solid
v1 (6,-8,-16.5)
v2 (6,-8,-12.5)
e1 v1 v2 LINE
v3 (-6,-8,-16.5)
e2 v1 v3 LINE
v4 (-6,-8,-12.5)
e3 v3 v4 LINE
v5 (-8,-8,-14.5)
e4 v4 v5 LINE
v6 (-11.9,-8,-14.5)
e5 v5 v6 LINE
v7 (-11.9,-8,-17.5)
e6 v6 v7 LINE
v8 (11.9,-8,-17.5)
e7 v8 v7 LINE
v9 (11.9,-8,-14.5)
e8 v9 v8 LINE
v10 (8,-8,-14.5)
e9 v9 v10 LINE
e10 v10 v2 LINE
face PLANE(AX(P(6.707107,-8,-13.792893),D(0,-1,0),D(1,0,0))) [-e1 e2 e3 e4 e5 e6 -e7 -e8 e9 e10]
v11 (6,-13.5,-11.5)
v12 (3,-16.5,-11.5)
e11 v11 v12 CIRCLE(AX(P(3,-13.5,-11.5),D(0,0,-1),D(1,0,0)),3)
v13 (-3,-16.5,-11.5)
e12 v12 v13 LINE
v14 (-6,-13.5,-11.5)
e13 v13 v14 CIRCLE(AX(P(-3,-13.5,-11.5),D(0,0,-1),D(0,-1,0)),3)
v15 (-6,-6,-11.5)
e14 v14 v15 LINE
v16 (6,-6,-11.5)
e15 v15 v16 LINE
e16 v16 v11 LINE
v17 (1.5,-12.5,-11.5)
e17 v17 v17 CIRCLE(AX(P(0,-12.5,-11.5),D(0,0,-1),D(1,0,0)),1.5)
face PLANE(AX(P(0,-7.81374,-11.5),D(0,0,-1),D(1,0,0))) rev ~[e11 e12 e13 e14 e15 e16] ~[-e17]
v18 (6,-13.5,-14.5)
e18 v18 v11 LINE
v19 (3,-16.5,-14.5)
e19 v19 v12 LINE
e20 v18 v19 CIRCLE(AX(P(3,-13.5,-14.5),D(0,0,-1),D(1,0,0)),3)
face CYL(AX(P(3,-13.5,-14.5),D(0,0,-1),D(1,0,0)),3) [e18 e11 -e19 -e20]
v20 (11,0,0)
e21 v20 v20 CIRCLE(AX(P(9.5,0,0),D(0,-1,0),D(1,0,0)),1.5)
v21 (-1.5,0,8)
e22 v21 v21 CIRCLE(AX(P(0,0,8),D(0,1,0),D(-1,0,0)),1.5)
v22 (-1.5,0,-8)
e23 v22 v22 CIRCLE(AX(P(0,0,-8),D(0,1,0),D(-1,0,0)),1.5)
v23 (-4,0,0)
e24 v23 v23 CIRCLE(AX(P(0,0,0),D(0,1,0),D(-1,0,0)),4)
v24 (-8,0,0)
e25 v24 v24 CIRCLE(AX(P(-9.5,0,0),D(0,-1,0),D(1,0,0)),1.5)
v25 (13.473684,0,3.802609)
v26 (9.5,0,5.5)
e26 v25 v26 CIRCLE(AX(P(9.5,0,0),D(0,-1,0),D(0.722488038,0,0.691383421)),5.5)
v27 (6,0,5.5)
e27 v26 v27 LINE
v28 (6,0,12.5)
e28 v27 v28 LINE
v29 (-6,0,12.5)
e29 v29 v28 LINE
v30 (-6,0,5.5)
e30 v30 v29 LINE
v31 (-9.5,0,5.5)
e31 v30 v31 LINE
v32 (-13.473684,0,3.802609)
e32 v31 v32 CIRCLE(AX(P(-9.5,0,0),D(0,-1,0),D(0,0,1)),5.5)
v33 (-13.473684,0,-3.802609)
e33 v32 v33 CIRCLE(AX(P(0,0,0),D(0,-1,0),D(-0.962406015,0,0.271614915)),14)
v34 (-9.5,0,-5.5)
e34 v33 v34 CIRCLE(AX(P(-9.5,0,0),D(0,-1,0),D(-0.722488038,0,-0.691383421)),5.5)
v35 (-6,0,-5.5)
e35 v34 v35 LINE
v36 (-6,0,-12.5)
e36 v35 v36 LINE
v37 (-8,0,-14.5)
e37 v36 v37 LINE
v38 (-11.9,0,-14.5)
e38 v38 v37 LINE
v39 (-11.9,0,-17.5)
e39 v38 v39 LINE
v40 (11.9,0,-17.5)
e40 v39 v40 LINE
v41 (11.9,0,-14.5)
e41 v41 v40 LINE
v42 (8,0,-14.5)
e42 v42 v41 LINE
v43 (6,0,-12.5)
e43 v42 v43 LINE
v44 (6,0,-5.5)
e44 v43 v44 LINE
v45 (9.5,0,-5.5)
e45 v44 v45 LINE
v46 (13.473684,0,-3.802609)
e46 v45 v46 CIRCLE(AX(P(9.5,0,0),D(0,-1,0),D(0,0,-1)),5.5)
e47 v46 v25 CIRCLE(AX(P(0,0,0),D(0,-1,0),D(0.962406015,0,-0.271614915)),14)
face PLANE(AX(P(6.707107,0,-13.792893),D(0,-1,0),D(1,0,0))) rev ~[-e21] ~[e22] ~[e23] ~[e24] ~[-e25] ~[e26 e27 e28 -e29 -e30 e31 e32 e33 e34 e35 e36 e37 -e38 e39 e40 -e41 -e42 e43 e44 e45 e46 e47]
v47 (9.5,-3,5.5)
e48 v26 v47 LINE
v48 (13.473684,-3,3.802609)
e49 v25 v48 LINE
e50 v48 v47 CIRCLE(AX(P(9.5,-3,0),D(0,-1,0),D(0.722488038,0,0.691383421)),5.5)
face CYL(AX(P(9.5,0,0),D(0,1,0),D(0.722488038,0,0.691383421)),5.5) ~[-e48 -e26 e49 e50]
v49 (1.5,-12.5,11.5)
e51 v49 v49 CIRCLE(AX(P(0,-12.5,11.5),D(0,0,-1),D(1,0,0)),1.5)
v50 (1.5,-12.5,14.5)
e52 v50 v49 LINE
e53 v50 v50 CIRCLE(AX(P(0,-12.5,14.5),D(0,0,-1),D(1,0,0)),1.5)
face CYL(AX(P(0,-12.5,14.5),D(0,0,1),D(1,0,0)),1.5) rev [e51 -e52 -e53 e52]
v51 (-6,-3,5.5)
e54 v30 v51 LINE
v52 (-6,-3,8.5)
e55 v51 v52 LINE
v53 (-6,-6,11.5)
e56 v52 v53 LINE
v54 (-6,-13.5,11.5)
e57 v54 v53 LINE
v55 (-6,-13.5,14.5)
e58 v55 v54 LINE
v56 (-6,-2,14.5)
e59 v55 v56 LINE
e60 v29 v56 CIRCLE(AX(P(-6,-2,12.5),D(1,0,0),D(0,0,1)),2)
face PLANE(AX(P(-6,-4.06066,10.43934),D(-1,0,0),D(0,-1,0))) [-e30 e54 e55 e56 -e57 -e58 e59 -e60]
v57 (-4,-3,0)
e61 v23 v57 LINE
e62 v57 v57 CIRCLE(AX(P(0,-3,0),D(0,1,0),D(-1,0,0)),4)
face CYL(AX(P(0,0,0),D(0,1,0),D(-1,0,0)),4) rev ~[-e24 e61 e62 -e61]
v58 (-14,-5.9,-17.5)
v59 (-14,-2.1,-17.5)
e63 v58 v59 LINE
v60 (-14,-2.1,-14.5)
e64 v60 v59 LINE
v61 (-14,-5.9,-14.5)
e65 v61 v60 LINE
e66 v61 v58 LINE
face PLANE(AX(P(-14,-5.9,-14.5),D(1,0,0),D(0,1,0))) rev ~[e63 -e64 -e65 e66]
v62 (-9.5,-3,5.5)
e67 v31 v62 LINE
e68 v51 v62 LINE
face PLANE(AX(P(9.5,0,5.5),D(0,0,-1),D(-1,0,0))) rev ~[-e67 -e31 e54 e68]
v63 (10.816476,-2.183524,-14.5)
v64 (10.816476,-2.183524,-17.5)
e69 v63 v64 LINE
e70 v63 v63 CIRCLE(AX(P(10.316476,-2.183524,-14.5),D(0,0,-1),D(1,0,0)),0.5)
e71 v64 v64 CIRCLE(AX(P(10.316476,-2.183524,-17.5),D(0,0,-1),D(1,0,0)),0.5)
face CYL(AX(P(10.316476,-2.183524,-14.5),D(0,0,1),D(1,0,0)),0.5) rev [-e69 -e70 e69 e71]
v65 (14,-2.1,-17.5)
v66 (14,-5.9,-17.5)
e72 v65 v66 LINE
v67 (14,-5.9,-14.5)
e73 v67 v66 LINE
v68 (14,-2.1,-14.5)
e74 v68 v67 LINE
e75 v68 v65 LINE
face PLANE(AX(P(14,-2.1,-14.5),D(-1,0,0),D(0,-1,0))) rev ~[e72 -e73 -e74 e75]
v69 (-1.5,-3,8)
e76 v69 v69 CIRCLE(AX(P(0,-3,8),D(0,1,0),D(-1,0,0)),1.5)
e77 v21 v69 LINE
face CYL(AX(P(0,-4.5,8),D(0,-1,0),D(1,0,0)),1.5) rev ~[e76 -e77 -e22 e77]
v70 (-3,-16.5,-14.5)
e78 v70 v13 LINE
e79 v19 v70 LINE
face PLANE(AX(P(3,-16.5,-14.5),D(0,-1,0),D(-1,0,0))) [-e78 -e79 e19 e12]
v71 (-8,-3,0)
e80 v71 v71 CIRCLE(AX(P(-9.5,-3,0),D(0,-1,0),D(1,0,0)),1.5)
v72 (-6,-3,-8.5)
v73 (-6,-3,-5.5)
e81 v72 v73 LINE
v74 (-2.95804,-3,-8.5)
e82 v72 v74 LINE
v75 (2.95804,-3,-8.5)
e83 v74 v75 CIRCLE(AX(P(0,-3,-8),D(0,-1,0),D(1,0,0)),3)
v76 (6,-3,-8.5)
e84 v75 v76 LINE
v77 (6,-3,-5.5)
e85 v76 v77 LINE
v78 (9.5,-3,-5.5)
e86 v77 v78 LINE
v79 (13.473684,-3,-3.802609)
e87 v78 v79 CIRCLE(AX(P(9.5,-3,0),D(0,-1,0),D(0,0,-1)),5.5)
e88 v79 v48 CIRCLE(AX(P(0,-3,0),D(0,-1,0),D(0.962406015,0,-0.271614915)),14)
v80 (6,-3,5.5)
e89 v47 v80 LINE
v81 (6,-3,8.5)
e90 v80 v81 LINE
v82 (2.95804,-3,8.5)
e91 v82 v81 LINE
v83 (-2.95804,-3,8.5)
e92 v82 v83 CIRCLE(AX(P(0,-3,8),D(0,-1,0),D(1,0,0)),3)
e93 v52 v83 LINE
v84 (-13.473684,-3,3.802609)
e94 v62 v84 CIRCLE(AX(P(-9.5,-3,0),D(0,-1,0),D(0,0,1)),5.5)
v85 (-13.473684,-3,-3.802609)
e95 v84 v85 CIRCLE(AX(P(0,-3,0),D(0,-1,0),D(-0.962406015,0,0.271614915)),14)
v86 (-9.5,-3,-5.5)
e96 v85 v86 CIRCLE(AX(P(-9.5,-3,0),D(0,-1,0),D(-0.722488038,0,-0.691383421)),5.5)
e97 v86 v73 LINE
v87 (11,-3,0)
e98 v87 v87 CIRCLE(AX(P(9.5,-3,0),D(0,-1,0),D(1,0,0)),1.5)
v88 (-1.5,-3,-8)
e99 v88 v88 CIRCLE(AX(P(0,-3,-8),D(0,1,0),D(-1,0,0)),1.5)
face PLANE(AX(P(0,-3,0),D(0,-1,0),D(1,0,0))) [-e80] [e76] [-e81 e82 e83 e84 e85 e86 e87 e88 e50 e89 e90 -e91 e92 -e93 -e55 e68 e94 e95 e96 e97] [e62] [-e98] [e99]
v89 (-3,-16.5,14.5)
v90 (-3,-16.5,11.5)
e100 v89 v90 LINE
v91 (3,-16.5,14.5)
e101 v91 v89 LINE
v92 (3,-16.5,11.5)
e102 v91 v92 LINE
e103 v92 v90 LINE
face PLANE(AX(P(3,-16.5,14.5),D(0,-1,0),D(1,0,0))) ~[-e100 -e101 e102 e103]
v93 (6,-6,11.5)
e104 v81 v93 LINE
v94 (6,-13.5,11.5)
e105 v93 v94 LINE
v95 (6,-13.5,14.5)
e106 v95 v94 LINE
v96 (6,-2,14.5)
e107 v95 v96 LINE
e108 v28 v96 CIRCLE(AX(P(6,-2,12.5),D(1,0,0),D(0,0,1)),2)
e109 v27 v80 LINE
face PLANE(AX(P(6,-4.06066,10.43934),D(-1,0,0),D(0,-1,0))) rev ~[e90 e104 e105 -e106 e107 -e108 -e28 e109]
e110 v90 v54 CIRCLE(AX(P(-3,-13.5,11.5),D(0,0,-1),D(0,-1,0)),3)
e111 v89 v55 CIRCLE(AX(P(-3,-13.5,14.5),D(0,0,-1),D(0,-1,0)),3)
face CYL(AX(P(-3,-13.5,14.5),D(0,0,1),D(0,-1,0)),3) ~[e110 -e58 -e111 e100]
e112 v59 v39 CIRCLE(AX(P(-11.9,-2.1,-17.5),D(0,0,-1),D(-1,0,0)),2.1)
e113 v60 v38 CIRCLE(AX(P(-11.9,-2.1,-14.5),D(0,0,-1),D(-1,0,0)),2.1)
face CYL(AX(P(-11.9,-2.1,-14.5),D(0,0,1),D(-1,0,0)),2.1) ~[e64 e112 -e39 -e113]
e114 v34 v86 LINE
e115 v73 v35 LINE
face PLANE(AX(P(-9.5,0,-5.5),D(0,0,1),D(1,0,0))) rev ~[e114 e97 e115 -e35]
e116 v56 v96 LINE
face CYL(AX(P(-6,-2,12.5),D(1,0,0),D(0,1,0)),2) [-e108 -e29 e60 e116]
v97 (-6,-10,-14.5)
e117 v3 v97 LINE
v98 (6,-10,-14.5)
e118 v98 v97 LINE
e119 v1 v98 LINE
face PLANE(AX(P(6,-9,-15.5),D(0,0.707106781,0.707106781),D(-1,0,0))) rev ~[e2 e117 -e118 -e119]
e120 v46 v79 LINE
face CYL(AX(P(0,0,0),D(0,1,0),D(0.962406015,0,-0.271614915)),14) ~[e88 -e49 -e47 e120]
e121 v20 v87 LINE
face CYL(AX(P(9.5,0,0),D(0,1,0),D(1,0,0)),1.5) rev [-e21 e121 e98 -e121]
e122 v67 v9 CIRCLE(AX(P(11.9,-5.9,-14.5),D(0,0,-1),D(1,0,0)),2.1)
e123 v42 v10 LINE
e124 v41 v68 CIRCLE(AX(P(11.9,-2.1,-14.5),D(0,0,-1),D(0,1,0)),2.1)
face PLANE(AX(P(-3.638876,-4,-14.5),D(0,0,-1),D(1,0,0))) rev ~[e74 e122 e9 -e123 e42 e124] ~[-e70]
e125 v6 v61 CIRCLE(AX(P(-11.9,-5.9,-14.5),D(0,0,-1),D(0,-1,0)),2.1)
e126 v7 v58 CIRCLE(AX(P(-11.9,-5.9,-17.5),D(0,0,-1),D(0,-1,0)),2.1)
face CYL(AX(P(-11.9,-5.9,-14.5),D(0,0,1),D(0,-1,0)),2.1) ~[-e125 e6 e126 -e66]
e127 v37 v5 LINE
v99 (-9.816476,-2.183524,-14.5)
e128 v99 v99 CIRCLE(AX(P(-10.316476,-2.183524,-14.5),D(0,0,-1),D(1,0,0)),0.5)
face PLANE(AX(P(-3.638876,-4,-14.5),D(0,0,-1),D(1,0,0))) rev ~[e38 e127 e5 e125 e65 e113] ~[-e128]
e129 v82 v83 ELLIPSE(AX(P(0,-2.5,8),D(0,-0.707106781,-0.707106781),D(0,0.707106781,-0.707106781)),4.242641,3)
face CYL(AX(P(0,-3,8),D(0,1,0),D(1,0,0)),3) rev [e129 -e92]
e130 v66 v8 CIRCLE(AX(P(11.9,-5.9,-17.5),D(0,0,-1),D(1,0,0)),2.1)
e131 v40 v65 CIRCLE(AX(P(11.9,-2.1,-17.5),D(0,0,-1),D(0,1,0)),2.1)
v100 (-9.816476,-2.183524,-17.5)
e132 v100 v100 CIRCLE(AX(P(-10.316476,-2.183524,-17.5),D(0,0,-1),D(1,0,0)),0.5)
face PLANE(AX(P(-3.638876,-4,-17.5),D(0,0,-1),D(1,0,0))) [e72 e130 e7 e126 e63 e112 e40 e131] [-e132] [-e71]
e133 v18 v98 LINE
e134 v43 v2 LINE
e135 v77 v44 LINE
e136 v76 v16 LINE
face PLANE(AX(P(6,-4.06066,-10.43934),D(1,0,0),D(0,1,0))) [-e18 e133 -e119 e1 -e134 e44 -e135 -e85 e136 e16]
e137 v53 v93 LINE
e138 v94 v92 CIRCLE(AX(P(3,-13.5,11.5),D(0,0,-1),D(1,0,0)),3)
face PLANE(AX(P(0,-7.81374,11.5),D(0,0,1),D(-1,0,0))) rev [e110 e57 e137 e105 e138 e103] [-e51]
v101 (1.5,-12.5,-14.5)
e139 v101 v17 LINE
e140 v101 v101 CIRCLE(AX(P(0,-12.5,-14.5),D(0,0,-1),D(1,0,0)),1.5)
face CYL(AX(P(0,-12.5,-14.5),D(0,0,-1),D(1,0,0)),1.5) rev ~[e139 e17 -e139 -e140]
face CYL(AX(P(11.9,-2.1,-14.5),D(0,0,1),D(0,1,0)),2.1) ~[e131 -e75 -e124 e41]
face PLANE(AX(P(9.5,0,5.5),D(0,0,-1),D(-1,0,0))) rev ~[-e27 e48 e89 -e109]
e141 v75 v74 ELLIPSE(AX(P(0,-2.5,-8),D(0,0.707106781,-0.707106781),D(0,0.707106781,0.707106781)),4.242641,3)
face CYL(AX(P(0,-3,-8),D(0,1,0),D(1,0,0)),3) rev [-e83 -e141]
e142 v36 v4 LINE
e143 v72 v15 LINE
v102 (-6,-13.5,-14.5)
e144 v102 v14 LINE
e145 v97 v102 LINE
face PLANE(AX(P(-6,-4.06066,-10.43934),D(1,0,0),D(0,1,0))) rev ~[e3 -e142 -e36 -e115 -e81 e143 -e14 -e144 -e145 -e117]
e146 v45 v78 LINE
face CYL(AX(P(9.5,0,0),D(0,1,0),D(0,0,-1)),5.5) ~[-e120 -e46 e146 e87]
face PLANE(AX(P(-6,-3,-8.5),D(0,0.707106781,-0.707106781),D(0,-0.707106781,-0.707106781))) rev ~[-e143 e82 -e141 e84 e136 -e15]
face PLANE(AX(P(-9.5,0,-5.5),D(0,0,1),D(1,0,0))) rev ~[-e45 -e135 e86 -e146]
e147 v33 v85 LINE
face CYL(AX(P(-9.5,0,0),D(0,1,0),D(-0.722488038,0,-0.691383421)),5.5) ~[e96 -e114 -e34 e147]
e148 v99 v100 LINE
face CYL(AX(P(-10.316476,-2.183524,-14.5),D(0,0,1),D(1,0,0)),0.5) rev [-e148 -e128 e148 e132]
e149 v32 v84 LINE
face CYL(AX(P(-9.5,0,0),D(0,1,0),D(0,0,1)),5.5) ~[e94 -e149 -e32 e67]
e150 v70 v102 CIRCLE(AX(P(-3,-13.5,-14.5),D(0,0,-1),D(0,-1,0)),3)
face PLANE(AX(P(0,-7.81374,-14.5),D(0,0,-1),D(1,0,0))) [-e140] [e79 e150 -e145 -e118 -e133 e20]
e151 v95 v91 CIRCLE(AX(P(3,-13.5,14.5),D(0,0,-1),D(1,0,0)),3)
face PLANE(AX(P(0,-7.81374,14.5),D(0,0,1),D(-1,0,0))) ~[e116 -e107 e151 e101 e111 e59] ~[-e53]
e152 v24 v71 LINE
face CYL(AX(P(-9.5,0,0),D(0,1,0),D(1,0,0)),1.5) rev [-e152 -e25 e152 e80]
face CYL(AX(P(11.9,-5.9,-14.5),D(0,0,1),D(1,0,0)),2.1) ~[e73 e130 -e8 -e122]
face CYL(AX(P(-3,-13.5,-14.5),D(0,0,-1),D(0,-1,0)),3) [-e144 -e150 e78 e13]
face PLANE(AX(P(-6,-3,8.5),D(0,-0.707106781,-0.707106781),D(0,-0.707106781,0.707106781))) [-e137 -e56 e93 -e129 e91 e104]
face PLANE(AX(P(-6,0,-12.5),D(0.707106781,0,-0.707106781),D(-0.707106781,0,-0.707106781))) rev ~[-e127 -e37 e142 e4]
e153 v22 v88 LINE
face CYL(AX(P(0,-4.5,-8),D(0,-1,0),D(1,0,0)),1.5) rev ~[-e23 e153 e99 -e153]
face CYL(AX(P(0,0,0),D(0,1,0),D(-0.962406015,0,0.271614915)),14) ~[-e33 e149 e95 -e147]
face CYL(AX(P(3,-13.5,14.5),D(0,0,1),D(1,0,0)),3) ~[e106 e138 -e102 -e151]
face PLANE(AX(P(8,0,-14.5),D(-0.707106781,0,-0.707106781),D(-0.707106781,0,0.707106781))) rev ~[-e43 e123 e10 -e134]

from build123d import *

# Parameters (mm, degrees)
F0_R          = 1.5
F0_R_2        = 4.5
F1_DEPTH      = 3
F2_W          = 12
F2_H          = 29
F3_DEPTH      = 3
F4_R          = 1.5
F5_DEPTH      = 3
F6_R          = 4
F6_R_2        = 1.5
F7_DEPTH      = 3
F9_R          = 2
F10_T4_DEPTH  = 12
F10_S5_R      = 1.5
F10_T6_DEPTH  = 8
F10_T10_DEPTH = 12
F10_S11_R     = 1.5
F10_T12_DEPTH = 8
F11_R         = 3
F12_DEPTH     = 4
F13_R         = 0.5
F14_DEPTH     = 3
F15_T1_DEPTH  = 8
F16_T1_DEPTH  = 8
F17_SIZE      = 2


# Not quite as in the source:
# - a fillet or chamfer that OpenCascade refuses, or shapes differently, is made with other operations: its cross-section is extruded or revolved along the edge and cut away or added


with BuildPart() as f1:
    # F0 (on Front) → F1 (new body)
    with BuildSketch(Plane.XZ):
        with BuildLine():
            Line((0, -5.5), (9.5, -5.5))
            ThreePointArc((9.5, -5.5), (11.6605151609, -5.0578823869), (13.4736842105, -3.8026088144))
            ThreePointArc((13.4736842105, -3.8026088144), (14, 0), (13.4736842105, 3.8026088144))
            ThreePointArc((13.4736842105, 3.8026088144), (11.6605151609, 5.0578823869), (9.5, 5.5))
            Line((9.5, 5.5), (0, 5.5))
            Line((0, 5.5), (-9.5, 5.5))
            ThreePointArc((-9.5, 5.5), (-11.6605151609, 5.0578823869), (-13.4736842105, 3.8026088144))
            ThreePointArc((-13.4736842105, 3.8026088144), (-14, 0), (-13.4736842105, -3.8026088144))
            ThreePointArc((-13.4736842105, -3.8026088144), (-11.6605151609, -5.0578823869), (-9.5, -5.5))
            Line((-9.5, -5.5), (0, -5.5))
        make_face()
        with Locations((-9.5, 0)):
            Circle(F0_R, mode=Mode.SUBTRACT)
        Circle(F0_R_2, mode=Mode.SUBTRACT)
        with Locations((9.5, 0)):
            Circle(F0_R, mode=Mode.SUBTRACT)
    extrude(amount=F1_DEPTH)

    # F2 (on face) → F3 (join)
    with BuildSketch(Plane.XZ.offset(3)):
        Rectangle(F2_W, F2_H)
    extrude(amount=-F3_DEPTH)

    # F4 (on face) → F5 (join)
    with BuildSketch(Plane(origin=(0, 0, -14.5), x_dir=(1, 0, 0), z_dir=(0, 0, -1))):
        with BuildLine():
            Line((-6, 13.5), (-6, 0))
            Line((-6, 0), (6, 0))
            Line((6, 0), (6, 13.5))
            ThreePointArc((6, 13.5), (5.1213203436, 15.6213203436), (3, 16.5))
            Line((3, 16.5), (-3, 16.5))
            ThreePointArc((-3, 16.5), (-5.1213203436, 15.6213203436), (-6, 13.5))
        make_face()
        with Locations((0, 12.5)):
            Circle(F4_R, mode=Mode.SUBTRACT)
    extrude(amount=-F5_DEPTH)

    # F6 (on face) → F7 (cut, through all)
    with BuildSketch(Plane(origin=(0, 0, 0), x_dir=(-1, 0, 0), z_dir=(0, 1, 0))):
        Circle(F6_R)
        with Locations((0, 8)):
            Circle(F6_R_2)
        with Locations((0, -8)):
            Circle(F6_R_2)
    extrude(amount=-F7_DEPTH, mode=Mode.SUBTRACT)

    # F8: F1 across plane


with BuildPart() as f1_1:
    add(f1.part)
    add(f1.part.mirror(Plane.XY))

    # F9
    f9_edges = [f1_1.edges().sort_by_distance(p)[0] for p in [
        (0, 0, 14.5),
    ]]
    fillet(f9_edges, radius=F9_R)

    # F10: chamfer of 3 on 2 edges, made by hand


with BuildPart() as f10_tool2:
    # F10_s3 → F10_t4 (new body)
    with BuildSketch(Plane.YZ.offset(-6)):
        Polygon((-3, 8.5), (-6, 11.5), (-3, 11.5), align=None)
    extrude(amount=F10_T4_DEPTH)

    # F10_s5 → F10_t6 (cut, symmetric)
    with BuildSketch(Plane.XZ.offset(4.5)):
        with Locations((0, 8)):
            Circle(F10_S5_R)
    extrude(amount=F10_T6_DEPTH, both=True, mode=Mode.SUBTRACT)


with BuildPart() as f1_2:
    add(f1_1.part)

    # F10_t1: union F10_tool2
    add(f10_tool2.part)


with BuildPart() as f10_tool8:
    # F10_s9 → F10_t10 (new body)
    with BuildSketch(Plane.YZ.offset(-6)):
        Polygon((-3, -8.5), (-6, -11.5), (-3, -11.5), align=None)
    extrude(amount=F10_T10_DEPTH)

    # F10_s11 → F10_t12 (cut, symmetric)
    with BuildSketch(Plane.XZ.offset(4.5)):
        with Locations((0, -8)):
            Circle(F10_S11_R)
    extrude(amount=F10_T12_DEPTH, both=True, mode=Mode.SUBTRACT)


with BuildPart() as f1_3:
    add(f1_2.part)

    # F10_t7: union F10_tool8
    add(f10_tool8.part)

    # F11 (on face) → F12 (cut)
    with BuildSketch(Plane.XZ.offset(3)):
        with Locations((0, 8)):
            Circle(F11_R)
        with Locations((0, -8)):
            Circle(F11_R)
    extrude(amount=F12_DEPTH, mode=Mode.SUBTRACT)

    # F13 (on face) → F14 (join)
    with BuildSketch(Plane(origin=(0, 0, -14.5), x_dir=(1, 0, 0), z_dir=(0, 0, -1))):
        with BuildLine():
            Line((-11.9, 0), (6, 0))
            Line((6, 0), (6, 8))
            Line((6, 8), (-11.9, 8))
            ThreePointArc((-11.9, 8), (-13.3849242405, 7.3849242405), (-14, 5.9))
            Line((-14, 5.9), (-14, 2.1))
            ThreePointArc((-14, 2.1), (-13.3849242405, 0.6150757595), (-11.9, 0))
        make_face()
        with Locations((-10.3164756671, 2.1835243329)):
            Circle(F13_R, mode=Mode.SUBTRACT)
        with BuildLine():
            Line((6, 8), (6, 0))
            Line((6, 0), (11.9, 0))
            ThreePointArc((11.9, 0), (13.3849242405, 0.6150757595), (14, 2.1))
            Line((14, 2.1), (14, 5.9))
            ThreePointArc((14, 5.9), (13.3849242405, 7.3849242405), (11.9, 8))
            Line((11.9, 8), (6, 8))
        make_face()
        with Locations((10.3164756671, 2.1835243329)):
            Circle(F13_R, mode=Mode.SUBTRACT)
    extrude(amount=F14_DEPTH)

    # F15: chamfer of 2 on 1 edges, made by hand

    # F15_s2 → F15_t1 (join)
    with BuildSketch(Plane.XZ):
        Polygon((-6, -12.5), (-8, -14.5), (-6, -14.5), align=None)
    extrude(amount=F15_T1_DEPTH)

    # F16: chamfer of 2 on 1 edges, made by hand

    # F16_s2 → F16_t1 (join)
    with BuildSketch(Plane.XZ):
        Polygon((8, -14.5), (6, -12.5), (6, -14.5), align=None)
    extrude(amount=F16_T1_DEPTH)

    # F17
    f17_edges = [f1_3.edges().sort_by_distance(p)[0] for p in [
        (0, -8, -14.5),
    ]]
    chamfer(f17_edges, length=F17_SIZE)


solid = f1_3.part
